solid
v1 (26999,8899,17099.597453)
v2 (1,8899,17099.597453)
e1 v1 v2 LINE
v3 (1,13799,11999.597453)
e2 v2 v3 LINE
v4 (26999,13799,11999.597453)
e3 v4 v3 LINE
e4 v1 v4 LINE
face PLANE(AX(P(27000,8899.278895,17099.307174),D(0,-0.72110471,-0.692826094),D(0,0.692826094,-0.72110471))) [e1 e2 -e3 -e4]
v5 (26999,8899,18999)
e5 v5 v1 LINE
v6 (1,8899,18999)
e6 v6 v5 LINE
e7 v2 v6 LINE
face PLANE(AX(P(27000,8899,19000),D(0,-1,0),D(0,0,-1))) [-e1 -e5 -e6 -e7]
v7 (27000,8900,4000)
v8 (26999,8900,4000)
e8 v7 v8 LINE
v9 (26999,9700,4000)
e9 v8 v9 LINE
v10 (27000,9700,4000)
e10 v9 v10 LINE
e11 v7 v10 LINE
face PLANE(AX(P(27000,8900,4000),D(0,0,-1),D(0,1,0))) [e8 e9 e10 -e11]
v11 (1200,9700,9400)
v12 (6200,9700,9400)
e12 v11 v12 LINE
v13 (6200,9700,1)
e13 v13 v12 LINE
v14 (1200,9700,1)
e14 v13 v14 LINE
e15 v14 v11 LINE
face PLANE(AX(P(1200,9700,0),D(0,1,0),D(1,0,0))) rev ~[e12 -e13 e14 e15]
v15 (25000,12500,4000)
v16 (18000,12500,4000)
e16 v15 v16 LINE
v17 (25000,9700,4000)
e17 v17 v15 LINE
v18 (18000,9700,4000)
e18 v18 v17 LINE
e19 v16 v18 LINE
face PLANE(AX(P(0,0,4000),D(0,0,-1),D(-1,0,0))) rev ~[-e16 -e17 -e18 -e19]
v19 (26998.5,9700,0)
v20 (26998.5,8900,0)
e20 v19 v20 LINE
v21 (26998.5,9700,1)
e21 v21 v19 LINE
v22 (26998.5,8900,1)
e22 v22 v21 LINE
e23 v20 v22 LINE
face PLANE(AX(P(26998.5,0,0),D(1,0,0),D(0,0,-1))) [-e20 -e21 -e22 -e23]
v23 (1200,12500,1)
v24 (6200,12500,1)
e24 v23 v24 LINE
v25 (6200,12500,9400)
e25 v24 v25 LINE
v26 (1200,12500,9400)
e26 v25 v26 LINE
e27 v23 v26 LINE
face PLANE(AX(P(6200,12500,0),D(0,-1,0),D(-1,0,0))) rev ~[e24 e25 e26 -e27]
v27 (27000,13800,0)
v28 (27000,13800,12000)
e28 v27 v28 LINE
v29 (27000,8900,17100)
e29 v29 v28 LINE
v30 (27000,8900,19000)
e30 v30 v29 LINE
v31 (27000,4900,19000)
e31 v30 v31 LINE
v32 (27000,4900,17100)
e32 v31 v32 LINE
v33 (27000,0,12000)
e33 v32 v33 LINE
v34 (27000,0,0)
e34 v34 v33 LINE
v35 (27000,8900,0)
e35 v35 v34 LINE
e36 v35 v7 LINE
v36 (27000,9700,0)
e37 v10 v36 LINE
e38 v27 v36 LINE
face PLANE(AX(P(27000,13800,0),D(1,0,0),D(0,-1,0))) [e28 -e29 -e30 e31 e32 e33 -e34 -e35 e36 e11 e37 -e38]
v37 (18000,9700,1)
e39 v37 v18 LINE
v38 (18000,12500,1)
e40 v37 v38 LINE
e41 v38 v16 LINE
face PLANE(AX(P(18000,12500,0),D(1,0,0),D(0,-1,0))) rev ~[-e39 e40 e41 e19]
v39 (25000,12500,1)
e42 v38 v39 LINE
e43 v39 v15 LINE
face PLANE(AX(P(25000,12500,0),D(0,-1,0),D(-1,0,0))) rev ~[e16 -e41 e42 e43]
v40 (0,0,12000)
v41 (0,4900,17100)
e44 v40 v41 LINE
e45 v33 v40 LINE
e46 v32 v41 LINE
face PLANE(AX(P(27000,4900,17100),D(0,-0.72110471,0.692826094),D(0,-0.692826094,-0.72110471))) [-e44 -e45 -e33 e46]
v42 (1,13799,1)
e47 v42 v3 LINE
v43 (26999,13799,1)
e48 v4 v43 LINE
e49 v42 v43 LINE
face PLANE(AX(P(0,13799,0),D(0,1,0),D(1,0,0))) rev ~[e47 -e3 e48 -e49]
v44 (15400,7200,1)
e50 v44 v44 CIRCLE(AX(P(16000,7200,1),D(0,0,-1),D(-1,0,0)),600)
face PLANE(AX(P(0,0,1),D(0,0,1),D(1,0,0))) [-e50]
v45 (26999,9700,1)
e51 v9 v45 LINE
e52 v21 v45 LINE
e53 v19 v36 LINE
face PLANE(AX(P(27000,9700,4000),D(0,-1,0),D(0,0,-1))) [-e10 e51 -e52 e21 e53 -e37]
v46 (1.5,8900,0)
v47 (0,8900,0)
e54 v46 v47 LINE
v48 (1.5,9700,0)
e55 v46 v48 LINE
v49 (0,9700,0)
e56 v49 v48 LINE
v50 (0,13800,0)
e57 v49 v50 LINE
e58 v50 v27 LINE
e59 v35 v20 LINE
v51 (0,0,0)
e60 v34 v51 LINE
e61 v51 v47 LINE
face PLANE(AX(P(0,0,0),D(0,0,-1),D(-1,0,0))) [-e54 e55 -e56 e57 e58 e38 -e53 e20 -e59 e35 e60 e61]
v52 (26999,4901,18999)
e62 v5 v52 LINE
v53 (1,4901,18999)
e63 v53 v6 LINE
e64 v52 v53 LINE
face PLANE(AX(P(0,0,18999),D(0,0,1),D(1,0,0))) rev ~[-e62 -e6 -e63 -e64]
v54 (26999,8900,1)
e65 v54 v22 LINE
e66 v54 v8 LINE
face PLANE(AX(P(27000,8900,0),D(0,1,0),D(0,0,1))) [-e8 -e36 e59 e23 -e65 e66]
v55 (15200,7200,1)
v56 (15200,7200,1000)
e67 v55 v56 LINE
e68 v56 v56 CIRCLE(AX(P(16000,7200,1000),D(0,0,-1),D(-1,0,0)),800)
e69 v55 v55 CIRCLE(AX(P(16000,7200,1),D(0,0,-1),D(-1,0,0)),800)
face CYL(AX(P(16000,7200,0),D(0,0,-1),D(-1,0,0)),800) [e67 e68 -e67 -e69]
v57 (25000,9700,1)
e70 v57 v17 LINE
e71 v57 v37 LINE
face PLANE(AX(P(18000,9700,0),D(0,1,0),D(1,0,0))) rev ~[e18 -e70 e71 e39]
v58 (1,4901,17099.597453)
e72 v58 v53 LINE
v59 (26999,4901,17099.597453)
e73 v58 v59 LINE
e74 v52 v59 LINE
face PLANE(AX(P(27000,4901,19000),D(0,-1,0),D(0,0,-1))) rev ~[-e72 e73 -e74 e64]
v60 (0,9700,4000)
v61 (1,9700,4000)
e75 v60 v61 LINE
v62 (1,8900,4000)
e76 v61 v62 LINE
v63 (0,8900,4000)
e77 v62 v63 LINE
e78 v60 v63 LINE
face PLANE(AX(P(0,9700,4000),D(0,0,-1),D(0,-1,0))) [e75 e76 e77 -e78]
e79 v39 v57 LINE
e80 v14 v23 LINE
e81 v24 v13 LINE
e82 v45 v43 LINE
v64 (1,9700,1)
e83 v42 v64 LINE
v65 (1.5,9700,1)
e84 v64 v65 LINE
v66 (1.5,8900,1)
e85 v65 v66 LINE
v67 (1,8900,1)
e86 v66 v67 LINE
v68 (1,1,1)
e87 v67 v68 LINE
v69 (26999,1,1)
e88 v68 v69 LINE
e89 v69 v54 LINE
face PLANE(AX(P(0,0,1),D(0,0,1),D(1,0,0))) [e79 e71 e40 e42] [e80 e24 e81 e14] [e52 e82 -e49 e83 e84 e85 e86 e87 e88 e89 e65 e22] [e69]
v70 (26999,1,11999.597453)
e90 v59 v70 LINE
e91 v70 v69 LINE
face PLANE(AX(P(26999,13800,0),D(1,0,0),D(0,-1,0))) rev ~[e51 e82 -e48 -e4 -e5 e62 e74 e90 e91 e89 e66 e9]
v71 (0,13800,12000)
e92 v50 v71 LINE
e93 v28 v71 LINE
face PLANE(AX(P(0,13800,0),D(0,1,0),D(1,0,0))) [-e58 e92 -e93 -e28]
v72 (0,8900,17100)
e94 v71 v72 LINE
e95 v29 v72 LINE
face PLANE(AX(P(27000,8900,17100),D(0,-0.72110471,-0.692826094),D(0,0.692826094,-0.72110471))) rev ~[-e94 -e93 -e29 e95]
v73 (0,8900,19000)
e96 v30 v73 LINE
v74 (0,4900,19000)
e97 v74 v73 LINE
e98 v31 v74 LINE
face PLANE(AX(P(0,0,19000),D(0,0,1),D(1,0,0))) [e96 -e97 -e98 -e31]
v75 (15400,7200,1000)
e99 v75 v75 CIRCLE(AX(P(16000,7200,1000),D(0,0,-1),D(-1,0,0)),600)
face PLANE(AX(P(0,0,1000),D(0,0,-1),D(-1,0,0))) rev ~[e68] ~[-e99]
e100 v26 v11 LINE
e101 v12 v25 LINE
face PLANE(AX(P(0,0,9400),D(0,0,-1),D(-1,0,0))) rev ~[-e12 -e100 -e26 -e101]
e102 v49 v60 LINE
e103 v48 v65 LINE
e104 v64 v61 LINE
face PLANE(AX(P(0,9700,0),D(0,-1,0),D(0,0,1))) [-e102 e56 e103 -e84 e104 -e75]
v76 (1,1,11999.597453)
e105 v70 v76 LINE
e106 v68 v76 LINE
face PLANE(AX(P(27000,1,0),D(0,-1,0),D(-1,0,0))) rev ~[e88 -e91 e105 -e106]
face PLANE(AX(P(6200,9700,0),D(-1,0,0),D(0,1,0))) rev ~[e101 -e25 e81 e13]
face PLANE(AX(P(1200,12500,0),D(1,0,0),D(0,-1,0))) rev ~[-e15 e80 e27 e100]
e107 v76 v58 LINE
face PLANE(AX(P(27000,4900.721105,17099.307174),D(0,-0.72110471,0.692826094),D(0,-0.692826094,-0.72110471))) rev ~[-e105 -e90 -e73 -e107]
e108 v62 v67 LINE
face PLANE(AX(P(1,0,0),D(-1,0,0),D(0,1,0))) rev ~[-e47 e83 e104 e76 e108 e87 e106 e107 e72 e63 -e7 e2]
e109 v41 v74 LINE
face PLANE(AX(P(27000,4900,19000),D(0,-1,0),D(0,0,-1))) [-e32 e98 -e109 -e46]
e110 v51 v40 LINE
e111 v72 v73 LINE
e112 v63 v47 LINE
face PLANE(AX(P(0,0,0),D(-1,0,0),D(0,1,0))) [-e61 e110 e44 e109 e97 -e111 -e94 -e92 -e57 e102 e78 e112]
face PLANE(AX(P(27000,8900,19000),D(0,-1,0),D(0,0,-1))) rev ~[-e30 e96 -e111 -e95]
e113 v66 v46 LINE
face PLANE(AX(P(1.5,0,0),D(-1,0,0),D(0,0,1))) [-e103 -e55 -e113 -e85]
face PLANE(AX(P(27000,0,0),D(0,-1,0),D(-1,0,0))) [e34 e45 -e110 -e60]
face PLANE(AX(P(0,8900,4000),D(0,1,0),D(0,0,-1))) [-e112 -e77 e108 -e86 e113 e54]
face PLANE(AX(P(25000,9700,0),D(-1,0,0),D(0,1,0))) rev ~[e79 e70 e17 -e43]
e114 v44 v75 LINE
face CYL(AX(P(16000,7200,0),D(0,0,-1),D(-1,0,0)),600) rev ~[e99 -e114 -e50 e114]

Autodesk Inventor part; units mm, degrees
ref_plane "YZ Plane" through (0, 0, 0) normal (1, 0, 0) x (0, 1, 0)
ref_plane "XZ Plane" through (0, 0, 0) normal (0, 1, 0) x (-1, 0, 0)
ref_plane "XY Plane" through (0, 0, 0) normal (0, 0, 1) x (1, 0, 0)
sketch "Sketch1" plane through (0, 0, 0) normal (0, 0, 1) x (1, 0, 0)
  line L0 (0, 13800) -> (27000, 13800)
  line L1 (27000, 13800) -> (27000, 0)
  line L2 (27000, 0) -> (0, 0)
  line L3 (0, 0) -> (0, 13800)
  dimension "d0" = 13800
  dimension "d1" = 27000
extrude "Extrusion1" add sketch "Sketch1" along normal blind 19000
sketch "Sketch2" plane through (27000, 0, 0) normal (1, 0, 0) x (0, 0, -1)
  line L0 (-19000, 13800) -> (-19000, 0) projected
  line L1 (0, 0) -> (-19000, 0) projected
  line L2 (0, 13800) -> (0, 0) projected
  line L3 (0, 13800) -> (-19000, 13800) projected
  line L4 (-4000, 9700) -> (0, 9700)
  line L5 (0, 9700) -> (0, 8900)
  line L6 (0, 8900) -> (-4000, 8900)
  line L7 (-4000, 8900) -> (-4000, 9700)
  line L8 (-19000, 8900) -> (-17100, 8900)
  line L9 (-17100, 8900) -> (-12000, 13800)
  line L10 (-19000, 4900) -> (-17100, 4900)
  line L11 (-17100, 4900) -> (-12000, 0)
  dimension "d4" = 4000
  dimension "d5" = 800
  dimension "d6" = 8900
  dimension "d7" = 4900
  dimension "d9" = 12000
  dimension "d11" = 1900
  dimension "d13" = 1900
  dimension "d14" = 4900
  dimension "d15" = 12000
extrude "Extrusion2" cut sketch "Sketch2" against normal through all contours L3 L9 L8 L0
extrude "Extrusion3" cut sketch "Sketch2" against normal through all contours L10 L11 L1 L0
sketch "Sketch3" plane through (0, 0, 0) normal (-1, 0, 0) x (0, 0, 1)
  line L0 (0, 0) -> (0, 13800) projected
  line L1 (0, 0) -> (12000, 0) projected
  line L2 (0, 9700) -> (4000, 9700)
  line L3 (4000, 9700) -> (4000, 8900)
  line L4 (4000, 8900) -> (0, 8900)
  line L5 (0, 8900) -> (0, 9700)
  dimension "d20" = 4000
  dimension "d21" = 800
  dimension "d22" = 8900
shell "Shell1" thickness 1 removed faces 0
extrude "Extrusion4" cut sketch "Sketch2" against normal mid plane 3 contours L2 L6 L7 L4
extrude "Extrusion5" cut sketch "Sketch3" against normal mid plane 3
sketch "Sketch4" plane through (0, 0, 0) normal (0, 0, -1) x (-1, 0, 0)
  line L0 (0, 9700) -> (0, 13800) projected
  line L1 (-27000, 0) -> (0, 0) projected
  line L2 (0, 0) -> (0, 8900) projected
  line L3 (-25000, 12500) -> (-18000, 12500)
  line L4 (-18000, 12500) -> (-18000, 9700)
  line L5 (-18000, 9700) -> (-25000, 9700)
  line L6 (-25000, 9700) -> (-25000, 12500)
  line L7 (-6200, 12500) -> (-1200, 12500)
  line L8 (-1200, 12500) -> (-1200, 9700)
  line L9 (-1200, 9700) -> (-6200, 9700)
  line L10 (-6200, 9700) -> (-6200, 12500)
  circle A0 centre (-16000, 7200) radius 600
  circle A1 centre (-16000, 7200) radius 800
  dimension "d28" = 2800
  dimension "d29" = 7000
  dimension "d30" = 18000
  dimension "d31" = 9700
  dimension "d32" = 5000
  dimension "d33" = 2800
  dimension "d34" = 1200
  dimension "d35" = 9700
  dimension "d36" = 1200
  dimension "d37" = 7200
  dimension "d38" = 16000
  dimension "d39" = 1600
extrude "Extrusion6" add sketch "Sketch4" against normal blind 9400 contours L7 L8 L9 L10
extrude "Extrusion7" add sketch "Sketch4" against normal blind 4000 contours L3 L4 L5 L6
extrude "Extrusion8" add sketch "Sketch4" against normal blind 1000 contours A1
properties part number "BE 2"
